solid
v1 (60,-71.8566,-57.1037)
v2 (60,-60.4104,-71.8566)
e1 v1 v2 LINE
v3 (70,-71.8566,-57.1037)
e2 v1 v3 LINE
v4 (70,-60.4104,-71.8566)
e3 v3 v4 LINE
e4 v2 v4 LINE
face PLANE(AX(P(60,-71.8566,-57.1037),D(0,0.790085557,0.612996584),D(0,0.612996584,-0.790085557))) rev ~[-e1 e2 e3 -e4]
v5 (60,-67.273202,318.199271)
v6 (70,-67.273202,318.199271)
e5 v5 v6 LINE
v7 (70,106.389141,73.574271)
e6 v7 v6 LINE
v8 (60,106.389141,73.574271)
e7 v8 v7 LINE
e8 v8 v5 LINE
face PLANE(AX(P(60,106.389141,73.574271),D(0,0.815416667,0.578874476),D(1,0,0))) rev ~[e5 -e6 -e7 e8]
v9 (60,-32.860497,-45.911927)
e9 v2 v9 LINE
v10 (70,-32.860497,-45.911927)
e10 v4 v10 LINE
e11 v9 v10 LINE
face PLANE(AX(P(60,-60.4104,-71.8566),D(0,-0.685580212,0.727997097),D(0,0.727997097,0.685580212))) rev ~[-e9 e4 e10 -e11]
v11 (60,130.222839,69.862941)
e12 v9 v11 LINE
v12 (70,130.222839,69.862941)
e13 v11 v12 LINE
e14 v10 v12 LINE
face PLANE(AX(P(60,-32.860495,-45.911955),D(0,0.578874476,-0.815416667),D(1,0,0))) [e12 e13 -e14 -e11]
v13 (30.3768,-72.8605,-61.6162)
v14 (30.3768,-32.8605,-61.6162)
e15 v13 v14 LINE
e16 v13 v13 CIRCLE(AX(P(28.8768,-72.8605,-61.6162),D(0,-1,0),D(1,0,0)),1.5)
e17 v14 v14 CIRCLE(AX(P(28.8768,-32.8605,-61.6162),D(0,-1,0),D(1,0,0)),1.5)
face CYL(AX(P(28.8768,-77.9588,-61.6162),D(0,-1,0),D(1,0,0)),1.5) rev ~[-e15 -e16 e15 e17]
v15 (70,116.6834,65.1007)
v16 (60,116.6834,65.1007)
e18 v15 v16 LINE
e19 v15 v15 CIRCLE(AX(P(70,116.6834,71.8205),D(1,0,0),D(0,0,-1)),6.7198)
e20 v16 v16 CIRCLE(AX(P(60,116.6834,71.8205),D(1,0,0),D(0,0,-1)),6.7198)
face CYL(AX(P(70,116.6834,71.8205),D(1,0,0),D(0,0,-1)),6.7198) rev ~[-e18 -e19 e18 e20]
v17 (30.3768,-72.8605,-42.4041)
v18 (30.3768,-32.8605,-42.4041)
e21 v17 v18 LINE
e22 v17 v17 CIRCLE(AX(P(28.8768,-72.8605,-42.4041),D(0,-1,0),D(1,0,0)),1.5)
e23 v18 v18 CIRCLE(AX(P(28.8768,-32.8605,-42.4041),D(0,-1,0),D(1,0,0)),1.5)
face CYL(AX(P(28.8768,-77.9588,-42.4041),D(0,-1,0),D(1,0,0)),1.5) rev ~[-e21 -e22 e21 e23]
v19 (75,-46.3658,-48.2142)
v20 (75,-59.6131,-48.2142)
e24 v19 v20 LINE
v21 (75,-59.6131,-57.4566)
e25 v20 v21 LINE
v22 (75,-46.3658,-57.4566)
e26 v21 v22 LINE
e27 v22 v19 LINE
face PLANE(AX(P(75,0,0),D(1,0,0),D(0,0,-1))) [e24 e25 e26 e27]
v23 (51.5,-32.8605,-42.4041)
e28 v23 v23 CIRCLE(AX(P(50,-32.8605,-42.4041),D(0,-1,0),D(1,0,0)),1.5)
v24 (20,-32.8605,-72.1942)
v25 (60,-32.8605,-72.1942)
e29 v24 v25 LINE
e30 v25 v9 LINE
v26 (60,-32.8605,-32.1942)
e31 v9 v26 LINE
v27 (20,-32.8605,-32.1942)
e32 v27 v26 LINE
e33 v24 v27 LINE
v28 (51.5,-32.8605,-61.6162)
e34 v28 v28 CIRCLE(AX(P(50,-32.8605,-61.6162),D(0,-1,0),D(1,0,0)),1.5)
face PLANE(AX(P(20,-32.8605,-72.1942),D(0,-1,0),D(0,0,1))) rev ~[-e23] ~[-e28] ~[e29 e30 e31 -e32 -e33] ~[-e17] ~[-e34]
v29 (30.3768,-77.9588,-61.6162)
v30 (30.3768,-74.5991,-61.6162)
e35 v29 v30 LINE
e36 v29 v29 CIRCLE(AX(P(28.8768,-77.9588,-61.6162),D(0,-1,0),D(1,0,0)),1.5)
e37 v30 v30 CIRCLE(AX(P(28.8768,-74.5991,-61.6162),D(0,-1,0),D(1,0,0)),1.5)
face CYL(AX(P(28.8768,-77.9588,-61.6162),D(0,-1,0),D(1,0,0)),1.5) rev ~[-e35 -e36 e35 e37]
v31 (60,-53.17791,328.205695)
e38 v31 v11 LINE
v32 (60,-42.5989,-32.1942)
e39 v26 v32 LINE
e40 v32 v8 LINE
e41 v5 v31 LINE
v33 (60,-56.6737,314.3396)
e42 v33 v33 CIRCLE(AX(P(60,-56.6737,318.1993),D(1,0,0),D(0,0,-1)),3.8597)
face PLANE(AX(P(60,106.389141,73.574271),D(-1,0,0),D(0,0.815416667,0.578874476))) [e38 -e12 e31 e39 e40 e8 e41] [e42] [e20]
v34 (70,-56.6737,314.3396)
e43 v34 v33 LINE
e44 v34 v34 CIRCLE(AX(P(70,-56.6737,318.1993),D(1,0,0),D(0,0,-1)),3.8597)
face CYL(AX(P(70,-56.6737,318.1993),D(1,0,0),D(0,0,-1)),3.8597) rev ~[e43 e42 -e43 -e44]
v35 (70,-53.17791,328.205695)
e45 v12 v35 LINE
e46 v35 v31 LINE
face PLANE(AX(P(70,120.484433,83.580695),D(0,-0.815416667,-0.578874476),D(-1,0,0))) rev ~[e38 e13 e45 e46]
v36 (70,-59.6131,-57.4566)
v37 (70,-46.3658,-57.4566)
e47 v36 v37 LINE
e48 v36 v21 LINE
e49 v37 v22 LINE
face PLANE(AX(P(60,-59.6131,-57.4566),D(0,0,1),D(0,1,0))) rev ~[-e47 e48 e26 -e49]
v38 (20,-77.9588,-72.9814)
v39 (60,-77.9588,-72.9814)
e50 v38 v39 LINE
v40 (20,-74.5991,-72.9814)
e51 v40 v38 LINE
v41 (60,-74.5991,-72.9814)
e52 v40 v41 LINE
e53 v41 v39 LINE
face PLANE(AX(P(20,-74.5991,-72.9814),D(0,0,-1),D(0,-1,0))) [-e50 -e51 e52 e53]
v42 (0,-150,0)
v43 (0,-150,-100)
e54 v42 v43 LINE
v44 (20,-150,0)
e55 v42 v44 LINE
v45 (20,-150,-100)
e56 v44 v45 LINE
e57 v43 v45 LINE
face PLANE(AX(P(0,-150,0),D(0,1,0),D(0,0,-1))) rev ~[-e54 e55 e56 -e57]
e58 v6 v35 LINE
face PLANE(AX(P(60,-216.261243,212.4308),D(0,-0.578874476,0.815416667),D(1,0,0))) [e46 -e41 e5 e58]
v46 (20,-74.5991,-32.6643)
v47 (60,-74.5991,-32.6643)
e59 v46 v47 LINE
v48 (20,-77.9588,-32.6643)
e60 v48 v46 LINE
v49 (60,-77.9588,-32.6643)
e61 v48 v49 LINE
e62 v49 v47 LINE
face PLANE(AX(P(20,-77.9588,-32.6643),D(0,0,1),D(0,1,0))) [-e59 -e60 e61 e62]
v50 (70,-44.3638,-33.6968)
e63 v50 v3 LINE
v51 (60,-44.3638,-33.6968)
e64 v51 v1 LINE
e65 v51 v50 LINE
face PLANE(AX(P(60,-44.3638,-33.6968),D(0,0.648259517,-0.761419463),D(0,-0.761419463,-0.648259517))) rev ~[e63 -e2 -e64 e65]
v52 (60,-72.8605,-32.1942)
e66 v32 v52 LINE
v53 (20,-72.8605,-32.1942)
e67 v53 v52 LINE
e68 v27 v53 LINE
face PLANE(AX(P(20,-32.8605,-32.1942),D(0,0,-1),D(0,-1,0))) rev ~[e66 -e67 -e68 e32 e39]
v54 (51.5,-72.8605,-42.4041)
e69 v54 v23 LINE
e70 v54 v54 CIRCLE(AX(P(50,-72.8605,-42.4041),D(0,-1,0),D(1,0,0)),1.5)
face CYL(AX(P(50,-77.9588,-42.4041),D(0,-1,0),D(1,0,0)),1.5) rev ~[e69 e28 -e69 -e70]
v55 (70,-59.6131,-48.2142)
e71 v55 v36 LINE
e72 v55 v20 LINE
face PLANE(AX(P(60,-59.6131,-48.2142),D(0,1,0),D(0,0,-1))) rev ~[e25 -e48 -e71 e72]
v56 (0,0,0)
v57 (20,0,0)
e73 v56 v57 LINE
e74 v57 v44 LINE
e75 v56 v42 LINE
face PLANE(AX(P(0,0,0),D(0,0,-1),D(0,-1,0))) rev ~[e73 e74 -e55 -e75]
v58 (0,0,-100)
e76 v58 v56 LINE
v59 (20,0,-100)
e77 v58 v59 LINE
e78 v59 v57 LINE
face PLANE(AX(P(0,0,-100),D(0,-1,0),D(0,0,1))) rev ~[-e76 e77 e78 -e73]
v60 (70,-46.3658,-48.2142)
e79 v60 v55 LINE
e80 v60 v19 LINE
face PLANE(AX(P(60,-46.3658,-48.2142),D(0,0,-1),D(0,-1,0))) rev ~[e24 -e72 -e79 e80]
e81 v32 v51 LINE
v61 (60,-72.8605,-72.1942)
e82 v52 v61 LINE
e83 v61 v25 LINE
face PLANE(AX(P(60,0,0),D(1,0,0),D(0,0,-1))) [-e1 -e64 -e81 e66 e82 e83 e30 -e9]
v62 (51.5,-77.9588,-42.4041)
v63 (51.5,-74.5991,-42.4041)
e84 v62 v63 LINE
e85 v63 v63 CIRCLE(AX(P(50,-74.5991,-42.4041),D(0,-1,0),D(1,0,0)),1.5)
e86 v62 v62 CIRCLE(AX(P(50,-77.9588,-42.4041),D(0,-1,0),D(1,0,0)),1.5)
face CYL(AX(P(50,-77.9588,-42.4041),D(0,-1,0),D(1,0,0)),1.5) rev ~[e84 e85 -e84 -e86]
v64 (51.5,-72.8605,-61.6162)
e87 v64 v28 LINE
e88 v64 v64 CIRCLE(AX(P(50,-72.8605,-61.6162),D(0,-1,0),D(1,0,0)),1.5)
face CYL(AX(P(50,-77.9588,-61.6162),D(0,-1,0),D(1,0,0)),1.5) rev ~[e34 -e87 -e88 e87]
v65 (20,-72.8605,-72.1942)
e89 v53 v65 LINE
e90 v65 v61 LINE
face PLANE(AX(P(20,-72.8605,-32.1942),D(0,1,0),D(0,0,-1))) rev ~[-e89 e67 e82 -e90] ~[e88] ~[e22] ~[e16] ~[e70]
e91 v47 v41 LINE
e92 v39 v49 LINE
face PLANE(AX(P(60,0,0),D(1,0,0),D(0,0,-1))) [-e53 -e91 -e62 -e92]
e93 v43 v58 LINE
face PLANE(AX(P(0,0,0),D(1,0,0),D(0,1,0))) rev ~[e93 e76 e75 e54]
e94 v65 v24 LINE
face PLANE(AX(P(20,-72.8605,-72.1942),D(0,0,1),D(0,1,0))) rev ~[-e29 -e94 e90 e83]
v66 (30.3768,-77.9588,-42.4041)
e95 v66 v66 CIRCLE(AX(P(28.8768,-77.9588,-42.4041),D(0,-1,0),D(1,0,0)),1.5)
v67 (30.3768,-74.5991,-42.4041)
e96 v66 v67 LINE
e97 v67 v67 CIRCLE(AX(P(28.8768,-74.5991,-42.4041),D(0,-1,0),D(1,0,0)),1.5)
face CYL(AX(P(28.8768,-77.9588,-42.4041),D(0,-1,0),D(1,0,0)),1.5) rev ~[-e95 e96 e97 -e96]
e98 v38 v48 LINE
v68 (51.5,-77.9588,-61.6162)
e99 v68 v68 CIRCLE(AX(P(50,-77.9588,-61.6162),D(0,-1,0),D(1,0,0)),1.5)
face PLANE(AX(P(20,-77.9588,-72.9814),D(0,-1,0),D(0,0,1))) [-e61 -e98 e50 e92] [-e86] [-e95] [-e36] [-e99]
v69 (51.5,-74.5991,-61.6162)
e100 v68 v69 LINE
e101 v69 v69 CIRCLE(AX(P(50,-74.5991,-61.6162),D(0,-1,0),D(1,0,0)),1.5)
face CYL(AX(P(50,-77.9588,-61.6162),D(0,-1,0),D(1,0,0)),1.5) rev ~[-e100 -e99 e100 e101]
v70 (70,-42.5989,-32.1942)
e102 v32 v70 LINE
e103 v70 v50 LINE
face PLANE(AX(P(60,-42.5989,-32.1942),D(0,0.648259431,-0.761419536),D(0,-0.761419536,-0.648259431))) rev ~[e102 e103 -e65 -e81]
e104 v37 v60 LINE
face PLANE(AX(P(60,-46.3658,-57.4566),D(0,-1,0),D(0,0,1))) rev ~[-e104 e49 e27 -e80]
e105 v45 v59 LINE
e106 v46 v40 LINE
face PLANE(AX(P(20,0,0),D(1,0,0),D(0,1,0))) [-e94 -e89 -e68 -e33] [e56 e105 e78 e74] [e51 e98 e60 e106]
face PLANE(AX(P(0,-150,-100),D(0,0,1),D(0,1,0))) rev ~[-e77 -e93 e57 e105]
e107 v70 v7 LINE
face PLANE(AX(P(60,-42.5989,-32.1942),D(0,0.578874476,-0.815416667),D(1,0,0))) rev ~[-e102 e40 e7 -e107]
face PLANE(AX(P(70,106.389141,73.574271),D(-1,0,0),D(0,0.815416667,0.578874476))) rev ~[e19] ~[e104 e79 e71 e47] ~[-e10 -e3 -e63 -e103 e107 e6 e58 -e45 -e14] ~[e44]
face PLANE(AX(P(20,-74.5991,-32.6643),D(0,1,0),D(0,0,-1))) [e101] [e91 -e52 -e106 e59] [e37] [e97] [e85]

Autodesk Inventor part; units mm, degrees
ref_plane "YZ Plane" through (0, 0, 0) normal (1, 0, 0) x (0, 1, 0)
ref_plane "XZ Plane" through (0, 0, 0) normal (0, 1, 0) x (-1, 0, 0)
ref_plane "XY Plane" through (0, 0, 0) normal (0, 0, 1) x (1, 0, 0)
sketch "Sketch1" plane through (0, 0, 0) normal (1, 0, 0) x (0, 1, 0)
  line L0 (0, 0) -> (-150, 0)
  line L1 (-150, 0) -> (-150, -100)
  line L2 (-150, -100) -> (0, -100)
  line L3 (0, -100) -> (0, 0)
  dimension "d0" = 150
  dimension "d1" = 100
extrude "Extrusion1" add sketch "Sketch1" along normal blind 20
sketch "Sketch2" plane through (20, 0, 0) normal (1, 0, 0) x (0, 0, -1)
  line L0 (32.1942, -72.8605) -> (72.1942, -72.8605)
  line L1 (72.1942, -72.8605) -> (72.1942, -32.8605)
  line L2 (72.1942, -32.8605) -> (32.1942, -32.8605)
  line L3 (32.1942, -32.8605) -> (32.1942, -72.8605)
  point P0 (0, 0)
  dimension "d4" = 40
  dimension "d5" = 40
extrude "Extrusion2" add sketch "Sketch2" along normal blind 40
sketch "Sketch3" plane through (60, 0, 0) normal (1, 0, 0) x (0, 0, -1)
  line L0 (32.1942, -72.8605) -> (32.1942, -32.8605) projected
  line L1 (32.1942, -72.8605) -> (32.1942, -32.8605)
  line L2 (32.1942, -32.8605) -> (32.1942, -52.8605)
  line L3 (48.2142, -59.6131) -> (57.4566, -59.6131)
  line L4 (57.4566, -59.6131) -> (57.4566, -46.3658)
  line L5 (57.4566, -46.3658) -> (48.2142, -46.3658)
  line L6 (48.2142, -46.3658) -> (48.2142, -59.6131)
  point P0 (0, 0)
extrude "Extrusion3" add sketch "Sketch3" along normal blind 15
sketch "Sketch4" plane through (60, 0, 0) normal (1, 0, 0) x (0, 0, -1)
  point P0 (0, 0)
sketch "Sketch5" plane through (60, 0, 0) normal (1, 0, 0) x (0, 0, -1)
  line L0 (57.1037, -71.8566) -> (71.8566, -60.4104)
  line L1 (71.8566, -60.4104) -> (45.9119, -32.8605)
  line L2 (32.1942, -32.8605) -> (72.1942, -32.8605) projected
  line L3 (33.6968, -44.3638) -> (57.1037, -71.8566)
  line L4 (32.1942, -42.5989) -> (45.9119, -32.8605)
  line L5 (32.1942, -42.5989) -> (57.1037, -71.8566)
  point P0 (0, 0)
extrude "Extrusion4" add sketch "Sketch5" along normal blind 10
sketch "Sketch6" plane through (60, -42.5989, -32.1942) normal (0, 0.8154167, 0.5788745) x (1, 0, 0)
  line L0 (0, 16.823) -> (10, 16.823) projected
  line L1 (0, 0) -> (10, 0) projected
  line L2 (10, 16.823) -> (0, 16.823)
  line L3 (0, 16.823) -> (0, 0)
  line L4 (0, 0) -> (10, 0)
  line L5 (10, 0) -> (10, 16.823)
  point P0 (-60, -1.5923)
extrude "Extrusion5" add sketch "Sketch6" along normal blind 200
sketch "Sketch7" plane through (60, -42.5989, -32.1942) normal (0, -0.5788745, 0.8154167) x (1, 0, 0)
  line L0 (10, 0) -> (10, 200) projected
  line L1 (0, 0) -> (0, 200) projected
  line L2 (10, 200) -> (0, 200)
  line L3 (0, 200) -> (0, 182.714)
  line L4 (0, 182.714) -> (10, 182.714)
  line L5 (10, 182.714) -> (10, 200)
  point P0 (-60, 53.3722)
extrude "Extrusion6" add sketch "Sketch7" along normal blind 300
sketch "Sketch8" plane through (70, 0, 0) normal (1, 0, 0) x (0, 0, -1)
  point P0 (0, 0)
sketch "Sketch9" plane through (70, 0, 0) normal (1, 0, 0) x (0, 0, -1)
  circle A0 centre (-71.8205, 116.6834) radius 6.7198
  point P0 (0, 0)
extrude "Extrusion7" cut sketch "Sketch9" along normal through all both and the other way through all
sketch "Sketch10" plane through (70, 0, 0) normal (1, 0, 0) x (0, 0, -1)
  point P0 (0, 0)
sketch "Sketch11" plane through (70, 0, 0) normal (1, 0, 0) x (0, 0, -1)
  circle A0 centre (-318.1993, -56.6737) radius 3.8597
  point P0 (0, 0)
extrude "Extrusion8" cut sketch "Sketch11" along normal through all both and the other way through all
sketch "Sketch16" plane through (20, 0, 0) normal (1, 0, 0) x (0, 0, -1)
  point P0 (0, 0)
sketch "Sketch17" plane through (20, 0, 0) normal (1, 0, 0) x (0, 0, -1)
  line L0 (32.6643, -74.5991) -> (72.9814, -74.5991)
  line L1 (72.9814, -74.5991) -> (72.9814, -77.9588)
  line L2 (72.9814, -77.9588) -> (32.6643, -77.9588)
  line L3 (32.6643, -77.9588) -> (32.6643, -74.5991)
  point P0 (0, 0)
extrude "Extrusion9" add sketch "Sketch17" along normal blind 40
sketch "Sketch18" plane through (20, -77.9588, -72.9814) normal (0, -1, 0) x (1, 0, 0)
  line L0 (0, 0.7872) -> (40, 0.7872) projected
  line L1 (40, 40.3171) -> (40, 0.7872)
  line L2 (40, 0.7872) -> (0, 0.7872)
  line L3 (0, 0.7872) -> (0, 40.3171)
  line L4 (0, 40.3171) -> (40, 40.3171)
  line L5 (40, 40.3171) -> (40, 0) projected
  line L6 (40, 20.1585) -> (0, 20.5522)
  line L7 (20, 40.3171) -> (20, 0)
  line L8 (0, 0) -> (40, 0) projected
  line L9 (40, 40.3171) -> (20, 40.3171)
  line L10 (30, 40.3171) -> (20, 40.3171)
  line L11 (0, 40.3171) -> (40, 40.3171) projected
  line L12 (0, 40.3171) -> (20, 40.3171)
  circle A0 centre (30, 30.5773) radius 1.5
  circle A1 centre (30, 11.3652) radius 1.5
  circle A2 centre (8.8768, 11.3652) radius 1.5
  circle A3 centre (8.8768, 30.5773) radius 1.5
  point P0 (-20, 72.9814)
  dimension "d22" = 3
  dimension "d23" = 3
  dimension "d24" = 3
  dimension "d25" = 3
extrude "Extrusion10" cut sketch "Sketch18" along normal through all both and the other way through all contours A0 | A1 | A2 | A3
properties part number "horizontal"
